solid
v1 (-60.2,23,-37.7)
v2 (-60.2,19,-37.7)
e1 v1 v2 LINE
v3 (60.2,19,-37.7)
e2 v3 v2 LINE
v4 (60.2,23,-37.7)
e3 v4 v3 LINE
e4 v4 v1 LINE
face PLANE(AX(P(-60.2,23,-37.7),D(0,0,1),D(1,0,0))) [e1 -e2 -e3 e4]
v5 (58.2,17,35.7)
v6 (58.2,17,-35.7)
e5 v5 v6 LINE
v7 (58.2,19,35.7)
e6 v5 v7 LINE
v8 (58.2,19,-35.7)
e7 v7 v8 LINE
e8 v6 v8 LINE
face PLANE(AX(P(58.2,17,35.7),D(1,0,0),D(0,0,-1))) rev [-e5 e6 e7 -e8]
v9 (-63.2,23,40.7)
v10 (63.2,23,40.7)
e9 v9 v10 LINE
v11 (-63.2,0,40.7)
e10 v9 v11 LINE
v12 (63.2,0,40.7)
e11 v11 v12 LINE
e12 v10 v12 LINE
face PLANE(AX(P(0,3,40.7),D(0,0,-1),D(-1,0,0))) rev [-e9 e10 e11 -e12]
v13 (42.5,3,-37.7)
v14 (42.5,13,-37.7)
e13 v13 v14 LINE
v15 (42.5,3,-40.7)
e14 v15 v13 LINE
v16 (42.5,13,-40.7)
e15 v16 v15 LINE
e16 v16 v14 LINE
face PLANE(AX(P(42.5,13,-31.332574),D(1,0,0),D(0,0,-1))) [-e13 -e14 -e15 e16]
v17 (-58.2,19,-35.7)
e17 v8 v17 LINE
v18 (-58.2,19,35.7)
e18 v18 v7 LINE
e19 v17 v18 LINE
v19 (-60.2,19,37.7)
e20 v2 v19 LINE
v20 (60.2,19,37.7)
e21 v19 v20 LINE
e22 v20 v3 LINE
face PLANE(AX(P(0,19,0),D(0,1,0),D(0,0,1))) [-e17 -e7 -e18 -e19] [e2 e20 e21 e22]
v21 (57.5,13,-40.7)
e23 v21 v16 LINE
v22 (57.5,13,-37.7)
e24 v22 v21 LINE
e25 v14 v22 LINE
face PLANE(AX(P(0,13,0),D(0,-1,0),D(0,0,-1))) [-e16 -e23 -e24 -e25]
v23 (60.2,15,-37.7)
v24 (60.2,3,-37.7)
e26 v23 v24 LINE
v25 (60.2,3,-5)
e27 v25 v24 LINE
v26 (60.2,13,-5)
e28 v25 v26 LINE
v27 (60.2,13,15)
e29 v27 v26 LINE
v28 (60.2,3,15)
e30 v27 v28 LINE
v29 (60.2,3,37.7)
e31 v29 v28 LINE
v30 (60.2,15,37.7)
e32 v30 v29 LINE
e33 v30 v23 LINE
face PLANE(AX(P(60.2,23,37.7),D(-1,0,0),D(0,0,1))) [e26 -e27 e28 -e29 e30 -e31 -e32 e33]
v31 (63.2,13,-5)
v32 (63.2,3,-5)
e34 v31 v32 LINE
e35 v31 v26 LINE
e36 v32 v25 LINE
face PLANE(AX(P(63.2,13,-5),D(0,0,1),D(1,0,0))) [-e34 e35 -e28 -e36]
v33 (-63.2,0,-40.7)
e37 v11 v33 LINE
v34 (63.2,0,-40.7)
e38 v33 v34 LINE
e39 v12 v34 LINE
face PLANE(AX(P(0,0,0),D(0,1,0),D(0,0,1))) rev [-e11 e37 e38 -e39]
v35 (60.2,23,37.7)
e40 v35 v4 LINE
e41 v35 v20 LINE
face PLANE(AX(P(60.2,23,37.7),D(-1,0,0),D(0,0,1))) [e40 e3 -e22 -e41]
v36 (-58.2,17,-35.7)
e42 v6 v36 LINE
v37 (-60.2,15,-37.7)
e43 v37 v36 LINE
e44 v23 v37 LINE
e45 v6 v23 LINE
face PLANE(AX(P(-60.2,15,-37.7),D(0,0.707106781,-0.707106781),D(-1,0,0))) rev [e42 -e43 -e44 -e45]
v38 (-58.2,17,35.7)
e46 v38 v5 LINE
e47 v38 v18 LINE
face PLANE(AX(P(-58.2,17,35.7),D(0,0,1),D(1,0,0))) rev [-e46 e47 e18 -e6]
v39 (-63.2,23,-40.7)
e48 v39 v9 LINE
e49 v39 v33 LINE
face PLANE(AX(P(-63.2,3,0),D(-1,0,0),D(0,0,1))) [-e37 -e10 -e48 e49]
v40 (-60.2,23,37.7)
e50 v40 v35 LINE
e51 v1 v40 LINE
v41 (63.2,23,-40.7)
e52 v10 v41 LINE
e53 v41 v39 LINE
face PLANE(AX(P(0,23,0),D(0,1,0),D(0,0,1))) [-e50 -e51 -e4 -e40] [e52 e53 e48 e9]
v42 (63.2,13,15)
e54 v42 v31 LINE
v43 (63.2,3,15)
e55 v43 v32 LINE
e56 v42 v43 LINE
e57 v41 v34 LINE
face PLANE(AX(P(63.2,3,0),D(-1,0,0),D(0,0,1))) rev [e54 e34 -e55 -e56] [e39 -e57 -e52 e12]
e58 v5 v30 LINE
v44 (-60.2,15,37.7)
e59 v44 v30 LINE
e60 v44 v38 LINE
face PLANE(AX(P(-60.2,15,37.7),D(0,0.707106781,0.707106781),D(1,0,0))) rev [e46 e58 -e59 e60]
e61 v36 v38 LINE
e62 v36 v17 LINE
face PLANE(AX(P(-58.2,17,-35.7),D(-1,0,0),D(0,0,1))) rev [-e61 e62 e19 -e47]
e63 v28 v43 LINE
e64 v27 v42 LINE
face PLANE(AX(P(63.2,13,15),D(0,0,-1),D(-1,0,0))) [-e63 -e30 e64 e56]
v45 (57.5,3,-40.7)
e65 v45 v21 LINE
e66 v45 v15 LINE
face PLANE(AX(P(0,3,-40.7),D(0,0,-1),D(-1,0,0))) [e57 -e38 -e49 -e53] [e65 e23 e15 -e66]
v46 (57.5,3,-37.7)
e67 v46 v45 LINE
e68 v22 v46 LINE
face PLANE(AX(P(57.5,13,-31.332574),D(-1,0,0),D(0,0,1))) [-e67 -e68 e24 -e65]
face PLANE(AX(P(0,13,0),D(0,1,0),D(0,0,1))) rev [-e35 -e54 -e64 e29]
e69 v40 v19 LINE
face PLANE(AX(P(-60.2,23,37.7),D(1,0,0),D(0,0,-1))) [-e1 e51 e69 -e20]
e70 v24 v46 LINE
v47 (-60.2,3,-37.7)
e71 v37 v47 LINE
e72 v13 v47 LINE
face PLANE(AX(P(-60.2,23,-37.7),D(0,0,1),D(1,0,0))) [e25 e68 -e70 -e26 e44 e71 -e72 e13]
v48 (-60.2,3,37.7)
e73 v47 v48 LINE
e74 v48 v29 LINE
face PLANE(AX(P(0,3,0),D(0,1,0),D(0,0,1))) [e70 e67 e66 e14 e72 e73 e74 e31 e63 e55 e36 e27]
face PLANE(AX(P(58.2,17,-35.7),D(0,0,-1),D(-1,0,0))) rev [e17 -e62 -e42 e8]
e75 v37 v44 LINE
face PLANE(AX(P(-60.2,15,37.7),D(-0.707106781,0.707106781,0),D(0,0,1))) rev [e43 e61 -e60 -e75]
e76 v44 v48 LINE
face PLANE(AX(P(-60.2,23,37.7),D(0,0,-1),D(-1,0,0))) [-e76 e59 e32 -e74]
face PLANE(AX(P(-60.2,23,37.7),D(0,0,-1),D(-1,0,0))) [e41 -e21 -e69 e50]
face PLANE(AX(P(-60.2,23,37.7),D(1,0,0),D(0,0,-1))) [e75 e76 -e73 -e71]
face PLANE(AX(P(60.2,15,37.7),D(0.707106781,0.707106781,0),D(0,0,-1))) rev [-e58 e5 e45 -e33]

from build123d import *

# Parameters (mm, degrees)
BOSS_EXTRUDE1_DEPTH = 3
SKETCH2_W           = 126.4
SKETCH2_H           = 81.4
SKETCH2_W_2         = 120.4
SKETCH2_H_2         = 75.4
BOSS_EXTRUDE2_DEPTH = 20
SKETCH4_W           = 7.2
SKETCH4_H           = 20
CUT_EXTRUDE1_DEPTH  = 10
SKETCH5_W           = 15
SKETCH5_H           = 12.33485255
CUT_EXTRUDE2_DEPTH  = 10
BOSS_EXTRUDE3_START = -4
SKETCH6_W           = 120.4
SKETCH6_H           = 75.4
SKETCH6_W_2         = 116.4
SKETCH6_H_2         = 71.4
BOSS_EXTRUDE3_DEPTH = 2
CHAMFER1_SIZE       = 2


with BuildPart() as part:
    # Sketch1 → Boss-Extrude1 (new body)
    with BuildSketch(Plane(origin=(0, 0, 0), x_dir=(1, 0, 0), z_dir=(0, 1, 0))):
        Polygon((63.2, 40.7), (-63.2, 40.7), (-63.2, -40.7), (63.2, -40.7), (63.2, -15), (63.2, 5), align=None)
    extrude(amount=BOSS_EXTRUDE1_DEPTH)

    # Sketch2 → Boss-Extrude2 (add)
    with BuildSketch(Plane(origin=(0, 3, 0), x_dir=(1, 0, 0), z_dir=(0, 1, 0))):
        Rectangle(SKETCH2_W, SKETCH2_H)
        Rectangle(SKETCH2_W_2, SKETCH2_H_2, mode=Mode.SUBTRACT)
    extrude(amount=BOSS_EXTRUDE2_DEPTH)

    # Sketch4 → Cut-Extrude1 (cut)
    with BuildSketch(Plane(origin=(0, 3, 0), x_dir=(1, 0, 0), z_dir=(0, 1, 0))):
        with Locations((59.6, -5)):
            Rectangle(SKETCH4_W, SKETCH4_H)
    extrude(amount=CUT_EXTRUDE1_DEPTH, mode=Mode.SUBTRACT)

    # Sketch5 → Cut-Extrude2 (cut)
    with BuildSketch(Plane(origin=(0, 3, 0), x_dir=(1, 0, 0), z_dir=(0, 1, 0))):
        with Locations((50, 37.5)):
            Rectangle(SKETCH5_W, SKETCH5_H)
    extrude(amount=CUT_EXTRUDE2_DEPTH, mode=Mode.SUBTRACT)

    # Sketch6 → Boss-Extrude3 (add)
    with BuildSketch(Plane(origin=(0, 23, 0), x_dir=(1, 0, 0), z_dir=(0, 1, 0)).offset(BOSS_EXTRUDE3_START)):
        Rectangle(SKETCH6_W, SKETCH6_H)
        Rectangle(SKETCH6_W_2, SKETCH6_H_2, mode=Mode.SUBTRACT)
    extrude(amount=-BOSS_EXTRUDE3_DEPTH)

    # Chamfer1
    chamfer1_edges = [part.edges().sort_by_distance(p)[0] for p in [
        (0, 17, 37.7),
        (-60.2, 17, 0),
        (0, 17, -37.7),
        (60.2, 17, 0),
    ]]
    chamfer(chamfer1_edges, length=CHAMFER1_SIZE - 0.0001)  # a hair under: the kernel refuses the full size


solid = part.part
